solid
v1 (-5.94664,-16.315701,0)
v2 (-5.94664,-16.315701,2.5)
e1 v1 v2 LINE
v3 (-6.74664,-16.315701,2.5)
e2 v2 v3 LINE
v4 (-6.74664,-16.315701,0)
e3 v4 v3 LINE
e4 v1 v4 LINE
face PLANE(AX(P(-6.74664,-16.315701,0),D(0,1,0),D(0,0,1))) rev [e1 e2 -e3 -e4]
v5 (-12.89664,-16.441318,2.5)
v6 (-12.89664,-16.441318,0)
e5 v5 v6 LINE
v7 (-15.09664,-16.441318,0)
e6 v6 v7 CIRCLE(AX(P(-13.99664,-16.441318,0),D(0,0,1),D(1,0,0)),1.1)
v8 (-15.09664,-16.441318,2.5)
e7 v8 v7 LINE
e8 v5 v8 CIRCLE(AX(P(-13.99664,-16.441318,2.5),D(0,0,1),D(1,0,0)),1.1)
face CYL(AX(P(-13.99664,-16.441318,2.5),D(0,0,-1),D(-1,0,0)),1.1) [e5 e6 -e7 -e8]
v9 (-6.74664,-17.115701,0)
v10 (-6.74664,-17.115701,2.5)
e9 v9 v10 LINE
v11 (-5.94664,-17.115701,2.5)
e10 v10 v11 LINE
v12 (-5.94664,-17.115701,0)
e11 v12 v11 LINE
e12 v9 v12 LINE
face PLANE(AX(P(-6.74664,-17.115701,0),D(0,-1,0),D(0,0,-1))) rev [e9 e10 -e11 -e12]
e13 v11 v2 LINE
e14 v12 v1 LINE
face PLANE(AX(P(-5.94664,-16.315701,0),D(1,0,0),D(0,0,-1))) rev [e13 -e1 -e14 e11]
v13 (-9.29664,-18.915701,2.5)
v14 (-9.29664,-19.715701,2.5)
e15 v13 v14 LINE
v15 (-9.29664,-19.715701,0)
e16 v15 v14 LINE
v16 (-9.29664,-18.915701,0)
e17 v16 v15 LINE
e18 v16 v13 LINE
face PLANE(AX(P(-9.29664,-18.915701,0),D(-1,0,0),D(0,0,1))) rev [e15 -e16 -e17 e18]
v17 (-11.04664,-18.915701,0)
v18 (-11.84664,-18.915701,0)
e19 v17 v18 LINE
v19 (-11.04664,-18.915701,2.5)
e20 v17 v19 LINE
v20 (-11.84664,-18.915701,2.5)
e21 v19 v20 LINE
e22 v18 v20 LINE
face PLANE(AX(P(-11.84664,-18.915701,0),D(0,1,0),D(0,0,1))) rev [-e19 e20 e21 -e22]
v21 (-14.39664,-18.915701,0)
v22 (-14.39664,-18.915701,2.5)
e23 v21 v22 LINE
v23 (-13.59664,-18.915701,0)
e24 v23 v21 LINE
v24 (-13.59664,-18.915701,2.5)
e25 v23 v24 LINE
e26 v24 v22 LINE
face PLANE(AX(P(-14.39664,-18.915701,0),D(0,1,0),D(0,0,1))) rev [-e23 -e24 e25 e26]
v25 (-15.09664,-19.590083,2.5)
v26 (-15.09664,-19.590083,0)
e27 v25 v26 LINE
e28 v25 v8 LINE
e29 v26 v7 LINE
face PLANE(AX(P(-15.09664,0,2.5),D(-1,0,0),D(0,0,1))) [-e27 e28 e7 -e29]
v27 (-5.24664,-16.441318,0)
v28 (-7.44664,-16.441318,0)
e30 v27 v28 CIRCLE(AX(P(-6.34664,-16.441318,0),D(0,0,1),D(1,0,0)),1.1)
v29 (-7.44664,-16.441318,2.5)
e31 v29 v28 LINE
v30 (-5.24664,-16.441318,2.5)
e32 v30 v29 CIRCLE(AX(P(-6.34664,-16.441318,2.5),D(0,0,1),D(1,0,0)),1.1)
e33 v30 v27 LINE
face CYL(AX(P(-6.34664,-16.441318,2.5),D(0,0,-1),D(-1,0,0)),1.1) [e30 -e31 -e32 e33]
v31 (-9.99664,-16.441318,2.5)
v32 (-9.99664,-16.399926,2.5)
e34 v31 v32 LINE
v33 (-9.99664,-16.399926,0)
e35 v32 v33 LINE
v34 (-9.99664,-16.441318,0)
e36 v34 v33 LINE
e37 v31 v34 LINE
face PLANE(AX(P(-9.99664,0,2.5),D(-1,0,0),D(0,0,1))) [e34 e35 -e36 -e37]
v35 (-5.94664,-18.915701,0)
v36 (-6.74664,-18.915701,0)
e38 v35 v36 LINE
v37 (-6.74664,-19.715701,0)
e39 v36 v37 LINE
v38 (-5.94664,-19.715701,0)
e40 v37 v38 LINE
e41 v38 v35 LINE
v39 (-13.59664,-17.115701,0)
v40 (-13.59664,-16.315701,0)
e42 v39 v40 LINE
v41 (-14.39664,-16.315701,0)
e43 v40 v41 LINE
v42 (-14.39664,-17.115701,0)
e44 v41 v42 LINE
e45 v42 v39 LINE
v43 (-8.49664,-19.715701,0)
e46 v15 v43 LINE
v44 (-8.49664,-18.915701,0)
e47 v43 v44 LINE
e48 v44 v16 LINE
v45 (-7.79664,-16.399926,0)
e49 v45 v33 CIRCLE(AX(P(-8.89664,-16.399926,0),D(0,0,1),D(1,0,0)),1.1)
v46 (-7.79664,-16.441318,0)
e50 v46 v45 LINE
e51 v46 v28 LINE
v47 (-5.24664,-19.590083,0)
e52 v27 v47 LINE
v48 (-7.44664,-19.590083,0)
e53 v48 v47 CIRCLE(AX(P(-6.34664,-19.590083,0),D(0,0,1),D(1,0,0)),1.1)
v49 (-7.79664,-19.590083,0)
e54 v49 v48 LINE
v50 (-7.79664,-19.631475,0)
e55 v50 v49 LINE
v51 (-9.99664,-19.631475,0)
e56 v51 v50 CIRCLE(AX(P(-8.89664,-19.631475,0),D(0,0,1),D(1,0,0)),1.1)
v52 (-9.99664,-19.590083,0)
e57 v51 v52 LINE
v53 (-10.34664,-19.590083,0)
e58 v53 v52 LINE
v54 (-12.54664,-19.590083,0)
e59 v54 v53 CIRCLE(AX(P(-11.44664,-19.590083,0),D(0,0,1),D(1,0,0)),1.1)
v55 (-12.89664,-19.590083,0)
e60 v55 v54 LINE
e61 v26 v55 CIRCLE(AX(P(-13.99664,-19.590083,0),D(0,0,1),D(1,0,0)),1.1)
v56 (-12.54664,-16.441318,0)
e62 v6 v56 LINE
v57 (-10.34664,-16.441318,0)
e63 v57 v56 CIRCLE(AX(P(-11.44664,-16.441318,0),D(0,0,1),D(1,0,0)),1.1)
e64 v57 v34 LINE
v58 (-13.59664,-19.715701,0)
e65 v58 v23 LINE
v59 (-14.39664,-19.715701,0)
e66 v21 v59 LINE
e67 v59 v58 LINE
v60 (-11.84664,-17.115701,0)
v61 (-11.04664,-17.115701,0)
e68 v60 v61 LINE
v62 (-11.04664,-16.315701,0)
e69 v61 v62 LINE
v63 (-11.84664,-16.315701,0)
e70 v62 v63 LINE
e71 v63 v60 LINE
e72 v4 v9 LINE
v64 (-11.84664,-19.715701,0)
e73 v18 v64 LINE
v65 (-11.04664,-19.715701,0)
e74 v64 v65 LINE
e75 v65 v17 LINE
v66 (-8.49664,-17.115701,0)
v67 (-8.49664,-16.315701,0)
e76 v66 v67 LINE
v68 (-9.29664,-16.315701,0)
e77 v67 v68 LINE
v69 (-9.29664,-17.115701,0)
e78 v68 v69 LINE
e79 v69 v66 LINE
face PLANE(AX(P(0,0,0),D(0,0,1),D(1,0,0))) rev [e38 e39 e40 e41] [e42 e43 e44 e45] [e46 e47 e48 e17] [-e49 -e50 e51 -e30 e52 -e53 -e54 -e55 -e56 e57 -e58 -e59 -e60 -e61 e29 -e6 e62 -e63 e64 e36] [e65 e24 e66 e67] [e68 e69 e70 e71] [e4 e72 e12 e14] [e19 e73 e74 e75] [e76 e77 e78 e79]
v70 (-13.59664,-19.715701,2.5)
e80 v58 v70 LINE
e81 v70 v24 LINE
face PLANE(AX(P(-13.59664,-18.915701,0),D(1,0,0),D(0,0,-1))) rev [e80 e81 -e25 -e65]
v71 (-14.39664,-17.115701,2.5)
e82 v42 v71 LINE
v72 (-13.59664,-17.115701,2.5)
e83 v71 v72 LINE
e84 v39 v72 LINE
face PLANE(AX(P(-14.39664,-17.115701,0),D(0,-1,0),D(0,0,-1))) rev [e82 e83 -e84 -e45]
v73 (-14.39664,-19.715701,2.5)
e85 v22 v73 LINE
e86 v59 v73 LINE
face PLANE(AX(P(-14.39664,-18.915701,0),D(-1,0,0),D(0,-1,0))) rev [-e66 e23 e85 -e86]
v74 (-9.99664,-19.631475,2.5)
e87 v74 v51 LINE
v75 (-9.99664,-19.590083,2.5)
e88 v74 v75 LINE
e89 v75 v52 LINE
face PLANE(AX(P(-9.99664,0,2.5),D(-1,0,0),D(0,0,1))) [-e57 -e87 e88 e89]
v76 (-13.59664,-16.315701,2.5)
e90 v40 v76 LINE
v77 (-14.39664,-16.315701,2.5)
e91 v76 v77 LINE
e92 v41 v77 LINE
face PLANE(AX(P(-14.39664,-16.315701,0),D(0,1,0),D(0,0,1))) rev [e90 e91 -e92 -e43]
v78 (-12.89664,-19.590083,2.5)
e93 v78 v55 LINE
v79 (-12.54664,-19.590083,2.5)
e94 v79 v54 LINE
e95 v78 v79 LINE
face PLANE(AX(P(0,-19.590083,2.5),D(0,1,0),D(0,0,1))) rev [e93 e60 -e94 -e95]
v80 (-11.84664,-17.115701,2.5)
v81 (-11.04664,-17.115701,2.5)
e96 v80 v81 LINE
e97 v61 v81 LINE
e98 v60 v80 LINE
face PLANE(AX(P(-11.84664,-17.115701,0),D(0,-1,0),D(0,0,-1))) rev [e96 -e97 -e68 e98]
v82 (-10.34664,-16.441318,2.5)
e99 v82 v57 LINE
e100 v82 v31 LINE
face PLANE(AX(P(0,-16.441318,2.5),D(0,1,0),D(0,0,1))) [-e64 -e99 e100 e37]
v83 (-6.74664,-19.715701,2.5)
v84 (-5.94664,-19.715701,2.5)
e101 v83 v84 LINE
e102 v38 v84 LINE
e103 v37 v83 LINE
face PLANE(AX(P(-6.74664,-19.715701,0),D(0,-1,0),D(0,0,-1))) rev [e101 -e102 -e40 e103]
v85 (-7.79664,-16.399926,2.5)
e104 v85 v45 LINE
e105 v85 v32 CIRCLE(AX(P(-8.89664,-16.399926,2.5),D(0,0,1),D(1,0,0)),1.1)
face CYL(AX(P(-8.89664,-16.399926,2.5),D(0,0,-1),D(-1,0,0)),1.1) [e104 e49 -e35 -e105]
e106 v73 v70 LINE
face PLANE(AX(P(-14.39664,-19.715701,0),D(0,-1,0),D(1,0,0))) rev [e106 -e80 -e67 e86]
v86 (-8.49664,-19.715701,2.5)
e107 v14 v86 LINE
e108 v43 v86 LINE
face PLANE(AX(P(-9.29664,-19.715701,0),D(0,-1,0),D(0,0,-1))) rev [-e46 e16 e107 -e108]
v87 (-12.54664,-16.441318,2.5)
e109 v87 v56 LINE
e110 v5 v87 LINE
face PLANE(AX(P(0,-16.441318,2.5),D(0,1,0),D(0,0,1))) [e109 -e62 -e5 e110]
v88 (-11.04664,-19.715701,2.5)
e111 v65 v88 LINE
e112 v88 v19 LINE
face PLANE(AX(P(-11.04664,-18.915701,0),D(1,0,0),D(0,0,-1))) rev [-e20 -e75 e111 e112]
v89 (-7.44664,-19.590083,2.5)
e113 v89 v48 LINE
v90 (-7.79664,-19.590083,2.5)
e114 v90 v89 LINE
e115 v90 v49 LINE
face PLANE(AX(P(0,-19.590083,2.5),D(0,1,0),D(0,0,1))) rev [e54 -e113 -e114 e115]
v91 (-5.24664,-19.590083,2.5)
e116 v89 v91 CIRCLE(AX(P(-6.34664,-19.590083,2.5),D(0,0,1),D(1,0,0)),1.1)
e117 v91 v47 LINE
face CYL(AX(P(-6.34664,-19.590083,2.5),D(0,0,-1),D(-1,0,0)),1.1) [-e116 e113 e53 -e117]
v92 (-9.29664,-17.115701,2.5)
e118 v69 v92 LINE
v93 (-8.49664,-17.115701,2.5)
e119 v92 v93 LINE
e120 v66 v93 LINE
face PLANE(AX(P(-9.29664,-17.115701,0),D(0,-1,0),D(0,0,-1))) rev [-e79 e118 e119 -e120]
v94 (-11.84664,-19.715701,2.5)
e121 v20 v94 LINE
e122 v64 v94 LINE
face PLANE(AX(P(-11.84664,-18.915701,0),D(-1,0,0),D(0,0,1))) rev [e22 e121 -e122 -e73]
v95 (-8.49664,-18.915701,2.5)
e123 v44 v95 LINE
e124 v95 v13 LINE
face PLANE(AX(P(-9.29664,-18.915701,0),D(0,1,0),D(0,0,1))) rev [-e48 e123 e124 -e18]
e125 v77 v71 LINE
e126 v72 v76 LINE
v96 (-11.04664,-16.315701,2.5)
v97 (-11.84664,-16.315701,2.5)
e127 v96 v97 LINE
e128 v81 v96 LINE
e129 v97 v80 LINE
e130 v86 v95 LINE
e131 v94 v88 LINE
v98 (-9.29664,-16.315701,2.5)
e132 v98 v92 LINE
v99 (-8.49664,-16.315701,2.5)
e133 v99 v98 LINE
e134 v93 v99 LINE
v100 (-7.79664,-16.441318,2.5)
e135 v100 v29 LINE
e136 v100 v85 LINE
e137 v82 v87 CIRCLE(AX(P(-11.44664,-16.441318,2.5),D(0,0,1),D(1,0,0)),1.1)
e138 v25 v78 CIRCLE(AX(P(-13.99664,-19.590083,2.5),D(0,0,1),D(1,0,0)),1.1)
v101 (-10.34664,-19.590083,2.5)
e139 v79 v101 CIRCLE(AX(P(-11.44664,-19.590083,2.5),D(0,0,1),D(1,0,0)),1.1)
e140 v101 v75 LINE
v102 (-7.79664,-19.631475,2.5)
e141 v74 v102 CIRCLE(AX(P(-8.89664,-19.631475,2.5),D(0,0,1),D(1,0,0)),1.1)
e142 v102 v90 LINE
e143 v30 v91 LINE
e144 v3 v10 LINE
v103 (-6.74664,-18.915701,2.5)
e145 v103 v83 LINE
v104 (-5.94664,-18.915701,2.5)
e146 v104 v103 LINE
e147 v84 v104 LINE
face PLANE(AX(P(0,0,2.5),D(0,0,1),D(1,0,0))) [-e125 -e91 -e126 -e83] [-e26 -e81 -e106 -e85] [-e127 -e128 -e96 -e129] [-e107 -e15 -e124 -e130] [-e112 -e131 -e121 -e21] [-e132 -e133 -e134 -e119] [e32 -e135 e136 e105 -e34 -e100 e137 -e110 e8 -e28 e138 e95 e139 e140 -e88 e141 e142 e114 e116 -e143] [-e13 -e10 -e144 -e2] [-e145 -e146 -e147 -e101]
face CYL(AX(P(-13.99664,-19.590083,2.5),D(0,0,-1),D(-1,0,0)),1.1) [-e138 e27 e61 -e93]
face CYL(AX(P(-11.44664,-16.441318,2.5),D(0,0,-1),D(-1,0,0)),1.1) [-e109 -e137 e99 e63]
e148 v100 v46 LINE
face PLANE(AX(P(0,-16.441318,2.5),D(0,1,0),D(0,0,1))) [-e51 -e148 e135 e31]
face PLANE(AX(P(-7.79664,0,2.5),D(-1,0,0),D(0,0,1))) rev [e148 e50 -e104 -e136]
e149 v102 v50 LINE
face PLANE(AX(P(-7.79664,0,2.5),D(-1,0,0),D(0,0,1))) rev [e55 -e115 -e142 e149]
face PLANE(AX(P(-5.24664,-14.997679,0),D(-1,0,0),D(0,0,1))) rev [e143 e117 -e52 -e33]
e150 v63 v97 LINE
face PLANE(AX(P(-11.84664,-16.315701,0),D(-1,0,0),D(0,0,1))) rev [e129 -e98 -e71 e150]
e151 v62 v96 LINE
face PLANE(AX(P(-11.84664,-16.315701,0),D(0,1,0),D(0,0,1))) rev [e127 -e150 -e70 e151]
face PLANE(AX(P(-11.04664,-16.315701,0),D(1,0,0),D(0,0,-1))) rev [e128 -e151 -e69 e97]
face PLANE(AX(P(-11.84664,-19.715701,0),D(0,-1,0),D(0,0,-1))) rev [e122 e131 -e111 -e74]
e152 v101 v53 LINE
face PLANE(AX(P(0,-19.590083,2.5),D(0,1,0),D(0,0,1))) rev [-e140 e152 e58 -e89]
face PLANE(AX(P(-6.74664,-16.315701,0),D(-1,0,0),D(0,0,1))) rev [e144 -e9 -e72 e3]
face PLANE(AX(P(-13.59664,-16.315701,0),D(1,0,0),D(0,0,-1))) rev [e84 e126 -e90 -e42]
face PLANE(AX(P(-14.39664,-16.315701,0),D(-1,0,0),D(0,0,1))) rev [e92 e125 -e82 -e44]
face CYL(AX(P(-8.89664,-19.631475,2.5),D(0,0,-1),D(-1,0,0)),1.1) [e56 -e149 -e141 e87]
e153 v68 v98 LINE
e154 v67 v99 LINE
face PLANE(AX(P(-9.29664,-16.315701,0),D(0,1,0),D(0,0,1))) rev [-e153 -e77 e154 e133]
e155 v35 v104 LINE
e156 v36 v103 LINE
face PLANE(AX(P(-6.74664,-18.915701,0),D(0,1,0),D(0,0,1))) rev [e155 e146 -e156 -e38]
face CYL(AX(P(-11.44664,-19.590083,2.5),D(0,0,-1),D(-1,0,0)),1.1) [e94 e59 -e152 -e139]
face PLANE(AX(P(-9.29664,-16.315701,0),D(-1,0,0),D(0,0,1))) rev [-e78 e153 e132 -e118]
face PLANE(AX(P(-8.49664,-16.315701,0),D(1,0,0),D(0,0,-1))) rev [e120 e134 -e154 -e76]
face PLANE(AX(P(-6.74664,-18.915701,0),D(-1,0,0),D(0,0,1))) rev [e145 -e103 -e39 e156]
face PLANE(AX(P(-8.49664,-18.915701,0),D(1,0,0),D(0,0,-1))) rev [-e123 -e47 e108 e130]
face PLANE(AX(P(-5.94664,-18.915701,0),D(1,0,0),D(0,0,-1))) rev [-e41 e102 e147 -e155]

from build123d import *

# Parameters (mm, degrees)
P_IDAT_VYSUNUT_M2_DEPTH  = 2.5
SKICA3_W                 = 0.8
SKICA3_H                 = 0.8
ODEBRAT_VYSUNUT_M1_DEPTH = 2.5
SKICA4_W                 = 8.539651134
SKICA4_H                 = 7.495504433
ODEBRAT_VYSUNUT_M2_DEPTH = 2.5


# Read off the part's stored shape, not the designer's step: Přidat vysunutím2
with BuildPart() as part:
    # Přidat vysunutím2 outline → Přidat vysunutím2 (new body)
    with BuildSketch(Plane.XY):
        with BuildLine():
            Line((2.40336004, -19.590083306), (2.40336004, -16.441317707))
            ThreePointArc((2.40336004, -16.441317707), (1.30336004, -15.341317707), (0.20336004, -16.441317707))
            Line((0.20336004, -16.441317707), (-0.14663996, -16.441317707))
            ThreePointArc((-0.14663996, -16.441317707), (-1.24602276, -15.34131788), (-2.346639267, -16.440083307))
            Line((-2.346639267, -16.440083307), (-2.696640653, -16.440083307))
            ThreePointArc((-2.696640653, -16.440083307), (-3.79725716, -15.34131788), (-4.89663996, -16.441317707))
            Line((-4.89663996, -16.441317707), (-5.24663996, -16.441317707))
            ThreePointArc((-5.24663996, -16.441317707), (-6.34663996, -15.341317707), (-7.44663996, -16.441317707))
            Line((-7.44663996, -16.441317707), (-7.79663996, -16.441317707))
            Line((-7.79663996, -16.441317707), (-7.79663996, -16.399925636))
            ThreePointArc((-7.79663996, -16.399925636), (-8.89663996, -15.299925636), (-9.99663996, -16.399925636))
            Line((-9.99663996, -16.399925636), (-9.99663996, -16.441317707))
            Line((-9.99663996, -16.441317707), (-10.34663996, -16.441317707))
            ThreePointArc((-10.34663996, -16.441317707), (-11.44663996, -15.341317707), (-12.54663996, -16.441317707))
            Line((-12.54663996, -16.441317707), (-12.89663996, -16.441317707))
            ThreePointArc((-12.89663996, -16.441317707), (-13.99663996, -15.341317707), (-15.09663996, -16.441317707))
            Line((-15.09663996, -16.441317707), (-15.09663996, -19.590083306))
            ThreePointArc((-15.09663996, -19.590083306), (-13.99663996, -20.690083306), (-12.89663996, -19.590083306))
            Line((-12.89663996, -19.590083306), (-12.54663996, -19.590083306))
            ThreePointArc((-12.54663996, -19.590083306), (-11.44663996, -20.690083306), (-10.34663996, -19.590083306))
            Line((-10.34663996, -19.590083306), (-9.99663996, -19.590083306))
            Line((-9.99663996, -19.590083306), (-9.99663996, -19.631475378))
            ThreePointArc((-9.99663996, -19.631475378), (-8.89663996, -20.731475378), (-7.79663996, -19.631475378))
            Line((-7.79663996, -19.631475378), (-7.79663996, -19.590083306))
            Line((-7.79663996, -19.590083306), (-7.44663996, -19.590083306))
            ThreePointArc((-7.44663996, -19.590083306), (-6.34663996, -20.690083306), (-5.24663996, -19.590083306))
            Line((-5.24663996, -19.590083306), (-4.89663996, -19.590083306))
            ThreePointArc((-4.89663996, -19.590083306), (-3.79663996, -20.690083306), (-2.69663996, -19.590083306))
            Line((-2.69663996, -19.590083306), (-2.34663996, -19.590083306))
            ThreePointArc((-2.34663996, -19.590083306), (-1.24663996, -20.690083306), (-0.14663996, -19.590083306))
            Line((-0.14663996, -19.590083306), (0.20336004, -19.590083306))
            ThreePointArc((0.20336004, -19.590083306), (1.30336004, -20.690083306), (2.40336004, -19.590083306))
        make_face()
    extrude(amount=P_IDAT_VYSUNUT_M2_DEPTH)

    # Skica3 → Odebrat vysunutím1 (cut)
    with BuildSketch(Plane.XY.offset(2.5)):
        with Locations((-13.99663996, -16.715700507)):
            Rectangle(SKICA3_W, SKICA3_H)
        with Locations((-13.99663996, -19.315700507)):
            Rectangle(SKICA3_W, SKICA3_H)
        with Locations((-8.89663996, -16.715700507)):
            Rectangle(SKICA3_W, SKICA3_H)
        with Locations((-11.44663996, -16.715700507)):
            Rectangle(SKICA3_W, SKICA3_H)
        with Locations((-11.44663996, -19.315700507)):
            Rectangle(SKICA3_W, SKICA3_H)
        with Locations((-8.89663996, -19.315700507)):
            Rectangle(SKICA3_W, SKICA3_H)
        with Locations((-6.34663996, -16.715700507)):
            Rectangle(SKICA3_W, SKICA3_H)
        with Locations((-6.34663996, -19.315700507)):
            Rectangle(SKICA3_W, SKICA3_H)
        with Locations((-3.79663996, -16.715700507)):
            Rectangle(SKICA3_W, SKICA3_H)
        with Locations((-3.79663996, -19.315700507)):
            Rectangle(SKICA3_W, SKICA3_H)
        with Locations((-1.24663996, -16.715700507)):
            Rectangle(SKICA3_W, SKICA3_H)
        with Locations((-1.24663996, -19.315700507)):
            Rectangle(SKICA3_W, SKICA3_H)
        with Locations((1.30336004, -16.715700507)):
            Rectangle(SKICA3_W, SKICA3_H)
        with Locations((1.30336004, -19.315700507)):
            Rectangle(SKICA3_W, SKICA3_H)
    extrude(amount=-ODEBRAT_VYSUNUT_M1_DEPTH, mode=Mode.SUBTRACT)

    # Skica4 → Odebrat vysunutím2 (cut)
    with BuildSketch(Plane.XY.offset(2.5)):
        with Locations((-0.976814393, -18.745431106)):
            Rectangle(SKICA4_W, SKICA4_H)
    extrude(amount=-ODEBRAT_VYSUNUT_M2_DEPTH, mode=Mode.SUBTRACT)


solid = part.part
